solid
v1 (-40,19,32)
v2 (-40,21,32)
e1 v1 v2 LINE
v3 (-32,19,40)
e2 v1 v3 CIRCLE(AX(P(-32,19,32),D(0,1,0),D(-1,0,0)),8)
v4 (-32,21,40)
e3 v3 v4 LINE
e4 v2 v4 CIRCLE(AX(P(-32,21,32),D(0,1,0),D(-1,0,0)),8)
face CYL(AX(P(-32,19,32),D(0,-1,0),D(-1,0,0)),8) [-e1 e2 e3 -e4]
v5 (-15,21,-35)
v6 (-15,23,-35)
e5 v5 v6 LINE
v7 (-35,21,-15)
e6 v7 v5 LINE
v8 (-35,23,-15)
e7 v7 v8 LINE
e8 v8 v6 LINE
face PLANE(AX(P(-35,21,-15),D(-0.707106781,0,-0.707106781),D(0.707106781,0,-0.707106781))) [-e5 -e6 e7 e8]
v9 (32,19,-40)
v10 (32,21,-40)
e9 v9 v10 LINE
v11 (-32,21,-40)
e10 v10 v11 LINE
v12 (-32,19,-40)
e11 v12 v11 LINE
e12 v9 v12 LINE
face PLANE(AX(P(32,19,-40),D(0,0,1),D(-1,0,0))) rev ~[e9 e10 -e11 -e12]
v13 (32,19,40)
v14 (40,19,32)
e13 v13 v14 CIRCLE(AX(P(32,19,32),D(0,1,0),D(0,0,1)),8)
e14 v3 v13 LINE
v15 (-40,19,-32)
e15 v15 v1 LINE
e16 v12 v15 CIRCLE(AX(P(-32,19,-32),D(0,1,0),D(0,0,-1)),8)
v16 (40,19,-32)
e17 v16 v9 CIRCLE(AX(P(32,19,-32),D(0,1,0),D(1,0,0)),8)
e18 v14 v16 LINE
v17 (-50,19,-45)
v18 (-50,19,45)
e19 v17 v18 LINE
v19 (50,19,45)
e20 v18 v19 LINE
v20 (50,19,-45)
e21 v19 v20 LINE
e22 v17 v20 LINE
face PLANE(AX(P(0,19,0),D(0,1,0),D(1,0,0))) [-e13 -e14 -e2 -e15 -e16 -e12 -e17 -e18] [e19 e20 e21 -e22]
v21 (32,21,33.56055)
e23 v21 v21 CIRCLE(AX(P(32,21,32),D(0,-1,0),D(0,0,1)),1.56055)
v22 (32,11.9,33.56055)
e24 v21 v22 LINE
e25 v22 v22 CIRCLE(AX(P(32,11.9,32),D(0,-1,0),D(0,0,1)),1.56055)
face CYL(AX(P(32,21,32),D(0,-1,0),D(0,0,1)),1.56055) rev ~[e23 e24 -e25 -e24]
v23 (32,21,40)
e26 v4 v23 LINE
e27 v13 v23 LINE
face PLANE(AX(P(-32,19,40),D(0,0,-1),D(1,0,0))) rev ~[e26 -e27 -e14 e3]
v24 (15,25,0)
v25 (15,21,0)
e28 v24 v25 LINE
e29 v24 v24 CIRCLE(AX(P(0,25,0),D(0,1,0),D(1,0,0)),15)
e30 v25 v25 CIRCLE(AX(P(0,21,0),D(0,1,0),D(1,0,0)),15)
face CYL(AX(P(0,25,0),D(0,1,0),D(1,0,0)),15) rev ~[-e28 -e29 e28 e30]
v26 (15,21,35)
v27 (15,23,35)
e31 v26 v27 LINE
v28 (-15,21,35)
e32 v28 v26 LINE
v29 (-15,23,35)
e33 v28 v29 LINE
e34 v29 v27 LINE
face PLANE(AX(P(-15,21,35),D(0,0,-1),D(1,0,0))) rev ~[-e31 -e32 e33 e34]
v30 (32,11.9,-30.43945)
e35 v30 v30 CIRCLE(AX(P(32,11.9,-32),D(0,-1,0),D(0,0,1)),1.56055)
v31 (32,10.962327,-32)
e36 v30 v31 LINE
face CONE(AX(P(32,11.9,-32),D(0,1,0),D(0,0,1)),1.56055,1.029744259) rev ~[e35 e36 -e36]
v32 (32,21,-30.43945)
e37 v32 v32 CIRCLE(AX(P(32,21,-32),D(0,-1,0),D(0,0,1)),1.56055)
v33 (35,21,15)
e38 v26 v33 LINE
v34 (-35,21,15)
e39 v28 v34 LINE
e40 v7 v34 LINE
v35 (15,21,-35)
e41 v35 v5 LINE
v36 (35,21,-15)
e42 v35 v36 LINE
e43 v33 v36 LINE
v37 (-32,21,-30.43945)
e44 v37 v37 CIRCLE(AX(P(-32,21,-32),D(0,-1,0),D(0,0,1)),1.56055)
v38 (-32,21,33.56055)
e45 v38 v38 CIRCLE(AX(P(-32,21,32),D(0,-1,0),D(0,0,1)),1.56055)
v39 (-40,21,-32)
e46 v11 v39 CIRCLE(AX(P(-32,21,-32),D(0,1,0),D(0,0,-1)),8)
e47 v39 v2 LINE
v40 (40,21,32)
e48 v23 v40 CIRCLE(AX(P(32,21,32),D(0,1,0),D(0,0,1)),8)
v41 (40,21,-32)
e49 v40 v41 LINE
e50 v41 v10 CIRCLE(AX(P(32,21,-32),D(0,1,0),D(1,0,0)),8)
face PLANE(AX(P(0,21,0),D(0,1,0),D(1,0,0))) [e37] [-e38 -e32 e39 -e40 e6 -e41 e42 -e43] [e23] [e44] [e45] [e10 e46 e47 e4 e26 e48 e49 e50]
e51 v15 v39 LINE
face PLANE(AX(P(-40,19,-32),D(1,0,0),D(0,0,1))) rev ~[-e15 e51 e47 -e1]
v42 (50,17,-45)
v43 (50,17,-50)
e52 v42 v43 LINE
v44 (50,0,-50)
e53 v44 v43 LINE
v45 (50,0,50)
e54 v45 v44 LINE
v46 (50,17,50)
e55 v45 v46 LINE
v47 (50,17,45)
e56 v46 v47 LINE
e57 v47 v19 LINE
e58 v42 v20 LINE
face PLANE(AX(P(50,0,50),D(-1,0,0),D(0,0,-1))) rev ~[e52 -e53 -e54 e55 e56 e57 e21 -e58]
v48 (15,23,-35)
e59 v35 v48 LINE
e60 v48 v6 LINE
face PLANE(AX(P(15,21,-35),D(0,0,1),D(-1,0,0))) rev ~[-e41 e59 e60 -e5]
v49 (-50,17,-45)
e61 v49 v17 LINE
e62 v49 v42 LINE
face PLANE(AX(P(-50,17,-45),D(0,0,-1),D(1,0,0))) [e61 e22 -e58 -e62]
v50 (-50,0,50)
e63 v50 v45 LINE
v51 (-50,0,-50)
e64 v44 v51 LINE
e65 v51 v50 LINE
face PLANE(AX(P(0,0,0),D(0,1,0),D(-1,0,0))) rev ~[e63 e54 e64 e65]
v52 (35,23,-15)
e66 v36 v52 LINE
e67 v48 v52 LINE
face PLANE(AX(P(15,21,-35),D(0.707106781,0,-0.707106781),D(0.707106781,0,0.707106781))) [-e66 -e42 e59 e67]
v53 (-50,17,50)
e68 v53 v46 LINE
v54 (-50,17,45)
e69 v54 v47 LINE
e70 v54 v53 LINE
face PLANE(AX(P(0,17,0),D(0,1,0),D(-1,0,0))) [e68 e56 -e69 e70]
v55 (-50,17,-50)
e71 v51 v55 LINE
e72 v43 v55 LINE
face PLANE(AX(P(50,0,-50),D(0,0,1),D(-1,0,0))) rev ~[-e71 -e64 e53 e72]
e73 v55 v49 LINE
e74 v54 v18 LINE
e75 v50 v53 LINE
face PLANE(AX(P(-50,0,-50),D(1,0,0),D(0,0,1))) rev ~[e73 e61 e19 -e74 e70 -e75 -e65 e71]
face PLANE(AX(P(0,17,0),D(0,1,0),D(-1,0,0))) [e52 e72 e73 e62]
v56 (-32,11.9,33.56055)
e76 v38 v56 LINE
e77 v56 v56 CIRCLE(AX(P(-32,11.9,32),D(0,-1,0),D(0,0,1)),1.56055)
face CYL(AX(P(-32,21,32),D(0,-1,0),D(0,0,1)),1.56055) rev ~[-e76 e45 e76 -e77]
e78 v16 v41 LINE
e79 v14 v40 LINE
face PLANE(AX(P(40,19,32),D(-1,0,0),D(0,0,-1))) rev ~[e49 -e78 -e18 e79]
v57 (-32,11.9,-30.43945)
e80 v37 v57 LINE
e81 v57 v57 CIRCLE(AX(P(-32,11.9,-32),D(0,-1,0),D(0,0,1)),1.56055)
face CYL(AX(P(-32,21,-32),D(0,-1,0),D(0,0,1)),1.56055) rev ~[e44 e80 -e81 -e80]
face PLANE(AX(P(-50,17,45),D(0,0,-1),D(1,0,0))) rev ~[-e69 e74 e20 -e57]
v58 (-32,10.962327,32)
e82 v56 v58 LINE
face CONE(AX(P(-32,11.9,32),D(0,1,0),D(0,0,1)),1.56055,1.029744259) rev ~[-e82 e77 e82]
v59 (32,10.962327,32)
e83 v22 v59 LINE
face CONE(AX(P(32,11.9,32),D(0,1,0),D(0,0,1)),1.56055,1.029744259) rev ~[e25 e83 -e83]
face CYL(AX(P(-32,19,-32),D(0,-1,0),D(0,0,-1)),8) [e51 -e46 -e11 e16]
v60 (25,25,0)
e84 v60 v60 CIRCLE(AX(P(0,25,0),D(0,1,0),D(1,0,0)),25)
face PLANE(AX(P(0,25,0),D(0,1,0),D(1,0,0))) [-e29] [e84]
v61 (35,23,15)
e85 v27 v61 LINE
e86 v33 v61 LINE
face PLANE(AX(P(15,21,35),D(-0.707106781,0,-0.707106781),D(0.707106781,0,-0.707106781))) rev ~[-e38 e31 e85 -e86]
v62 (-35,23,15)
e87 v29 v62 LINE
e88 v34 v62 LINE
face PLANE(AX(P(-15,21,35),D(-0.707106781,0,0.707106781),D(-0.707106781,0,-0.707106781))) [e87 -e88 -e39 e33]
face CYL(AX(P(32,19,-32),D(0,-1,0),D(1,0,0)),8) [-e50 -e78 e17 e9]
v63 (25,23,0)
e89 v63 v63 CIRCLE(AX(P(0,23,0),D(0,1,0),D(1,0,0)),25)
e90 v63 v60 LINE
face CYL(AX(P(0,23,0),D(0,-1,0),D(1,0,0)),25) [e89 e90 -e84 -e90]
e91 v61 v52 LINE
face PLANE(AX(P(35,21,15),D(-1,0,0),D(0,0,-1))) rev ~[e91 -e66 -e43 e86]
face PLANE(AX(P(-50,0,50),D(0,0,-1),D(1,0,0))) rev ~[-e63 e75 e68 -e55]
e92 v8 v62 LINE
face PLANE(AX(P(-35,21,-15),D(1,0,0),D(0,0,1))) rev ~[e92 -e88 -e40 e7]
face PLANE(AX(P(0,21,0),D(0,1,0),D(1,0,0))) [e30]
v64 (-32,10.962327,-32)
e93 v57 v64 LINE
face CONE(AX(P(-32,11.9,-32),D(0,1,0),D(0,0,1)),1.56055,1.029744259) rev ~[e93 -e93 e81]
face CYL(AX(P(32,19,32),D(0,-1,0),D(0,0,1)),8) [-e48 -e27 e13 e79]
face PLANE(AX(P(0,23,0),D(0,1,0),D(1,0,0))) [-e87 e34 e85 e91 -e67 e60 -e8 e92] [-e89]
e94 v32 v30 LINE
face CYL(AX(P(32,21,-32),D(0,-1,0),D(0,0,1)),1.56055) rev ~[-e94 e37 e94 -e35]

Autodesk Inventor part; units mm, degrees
ref_plane "YZ Plane" through (0, 0, 0) normal (1, 0, 0) x (0, 1, 0)
ref_plane "XZ Plane" through (0, 0, 0) normal (0, 1, 0) x (-1, 0, 0)
ref_plane "XY Plane" through (0, 0, 0) normal (0, 0, 1) x (1, 0, 0)
sketch "Sketch1" plane through (0, 0, 0) normal (0, 1, 0) x (-1, 0, 0)
  line L0 (50, 50) -> (-50, 50)
  line L1 (-50, 50) -> (-50, -50)
  line L2 (-50, -50) -> (50, -50)
  line L3 (50, -50) -> (50, 50)
  line L4 (50, 50) -> (-50, -50) construction
  line L5 (-50, 50) -> (50, -50) construction
  point P0 (0, 0)
  dimension "d0" = 100
  dimension "d1" = 100
extrude "Extrusion1" add sketch "Sketch1" along normal blind 17
sketch "Sketch2" plane through (0, 17, 0) normal (0, 1, 0) x (1, 0, 0)
  line L0 (-50, 50) -> (-50, -50) projected
  line L1 (50, -50) -> (50, 50) projected
  line L2 (-50, -45) -> (50, -45)
  line L3 (-50, -50) -> (50, -50) projected
  line L4 (-50, 45) -> (50, 45)
  line L5 (50, 50) -> (-50, 50) projected
  point P0 (0, 0)
  dimension "d4" = 5
  dimension "d5" = 5
extrude "Extrusion2" add sketch "Sketch2" along normal blind 2 contours L4 L1 L2 L0
sketch "Sketch3" plane through (0, 19, 0) normal (0, 1, 0) x (1, 0, 0)
  line L0 (-32, -40) -> (32, -40)
  line L1 (40, -32) -> (40, 32)
  line L2 (32, 40) -> (-32, 40)
  line L3 (-40, 32) -> (-40, -32)
  line L4 (-40, -40) -> (40, 40) construction
  line L5 (40, -40) -> (-40, 40) construction
  arc A0 (32, -40) -> (40, -32) centre (32, -32) ccw
  arc A1 (40, 32) -> (32, 40) centre (32, 32) ccw
  arc A2 (-32, 40) -> (-40, 32) centre (-32, 32) ccw
  arc A3 (-40, -32) -> (-32, -40) centre (-32, -32) ccw
  point P0 (0, 0)
  dimension "d8" = 80
  dimension "d9" = 80
  dimension "d10" = 8
extrude "Extrusion3" add sketch "Sketch3" along normal blind 2
sketch "Sketch4" plane through (0, 21, 0) normal (0, 1, 0) x (1, 0, 0)
  line L0 (35, -15) -> (35, 15)
  line L1 (-35, 15) -> (-35, -15)
  line L2 (-35, -15) -> (35, 15) construction
  line L3 (35, -15) -> (-35, 15) construction
  line L4 (50, -45) -> (50, 45) projected
  line L5 (-50, -50) -> (50, -50) projected
  line L6 (-15, -35) -> (15, -35)
  line L7 (15, 35) -> (-15, 35)
  line L8 (-15, -35) -> (15, 35) construction
  line L9 (15, -35) -> (-15, 35) construction
  line L10 (-15, -35) -> (-35, -15)
  line L11 (-35, 15) -> (-15, 35)
  line L12 (15, 35) -> (35, 15)
  line L13 (15, -35) -> (35, -15)
  point P0 (0, 0)
  dimension "d13" = 85
  dimension "d16" = 85
extrude "Extrusion4" add sketch "Sketch4" along normal blind 2
sketch "Sketch5" plane through (0, 23, 0) normal (0, 1, 0) x (1, 0, 0)
  circle A0 centre (0, 0) radius 25
  dimension "d19" = 50
extrude "Extrusion5" add sketch "Sketch5" along normal blind 2
sketch "Sketch6" plane through (0, 25, 0) normal (0, 1, 0) x (1, 0, 0)
  circle A0 centre (0, 0) radius 15
  dimension "d22" = 30
extrude "Extrusion6" cut sketch "Sketch6" against normal blind 4
sketch "Sketch7" plane through (0, 21, 0) normal (0, 1, 0) x (1, 0, 0)
  circle A0 centre (-32, -32) radius 1.5
  line L0 (-50, -50) -> (50, -50) projected
  line L1 (-50, 45) -> (-50, -45) projected
  circle A1 centre (-32, 32) radius 1.5
  circle A2 centre (32, -32) radius 1.5
  circle A3 centre (32, 32) radius 1.5
  point P0 (0, 0)
  dimension "d25" = 3
  dimension "d26" = 18
  dimension "d27" = 18
  dimension "d30" = 64
  dimension "d33" = 64
hole "Hole2" at (-32, 21, 32) at (-32, 21, -32) at (32, 21, -32) at (32, 21, 32) direction (0, -1, 0) diameter 3.1211 depth 9.1 tip angle 118 thread size "M3.5x0.35" class "6H" standard "ANSI Metric M Profile"
properties part number "A2P3"
